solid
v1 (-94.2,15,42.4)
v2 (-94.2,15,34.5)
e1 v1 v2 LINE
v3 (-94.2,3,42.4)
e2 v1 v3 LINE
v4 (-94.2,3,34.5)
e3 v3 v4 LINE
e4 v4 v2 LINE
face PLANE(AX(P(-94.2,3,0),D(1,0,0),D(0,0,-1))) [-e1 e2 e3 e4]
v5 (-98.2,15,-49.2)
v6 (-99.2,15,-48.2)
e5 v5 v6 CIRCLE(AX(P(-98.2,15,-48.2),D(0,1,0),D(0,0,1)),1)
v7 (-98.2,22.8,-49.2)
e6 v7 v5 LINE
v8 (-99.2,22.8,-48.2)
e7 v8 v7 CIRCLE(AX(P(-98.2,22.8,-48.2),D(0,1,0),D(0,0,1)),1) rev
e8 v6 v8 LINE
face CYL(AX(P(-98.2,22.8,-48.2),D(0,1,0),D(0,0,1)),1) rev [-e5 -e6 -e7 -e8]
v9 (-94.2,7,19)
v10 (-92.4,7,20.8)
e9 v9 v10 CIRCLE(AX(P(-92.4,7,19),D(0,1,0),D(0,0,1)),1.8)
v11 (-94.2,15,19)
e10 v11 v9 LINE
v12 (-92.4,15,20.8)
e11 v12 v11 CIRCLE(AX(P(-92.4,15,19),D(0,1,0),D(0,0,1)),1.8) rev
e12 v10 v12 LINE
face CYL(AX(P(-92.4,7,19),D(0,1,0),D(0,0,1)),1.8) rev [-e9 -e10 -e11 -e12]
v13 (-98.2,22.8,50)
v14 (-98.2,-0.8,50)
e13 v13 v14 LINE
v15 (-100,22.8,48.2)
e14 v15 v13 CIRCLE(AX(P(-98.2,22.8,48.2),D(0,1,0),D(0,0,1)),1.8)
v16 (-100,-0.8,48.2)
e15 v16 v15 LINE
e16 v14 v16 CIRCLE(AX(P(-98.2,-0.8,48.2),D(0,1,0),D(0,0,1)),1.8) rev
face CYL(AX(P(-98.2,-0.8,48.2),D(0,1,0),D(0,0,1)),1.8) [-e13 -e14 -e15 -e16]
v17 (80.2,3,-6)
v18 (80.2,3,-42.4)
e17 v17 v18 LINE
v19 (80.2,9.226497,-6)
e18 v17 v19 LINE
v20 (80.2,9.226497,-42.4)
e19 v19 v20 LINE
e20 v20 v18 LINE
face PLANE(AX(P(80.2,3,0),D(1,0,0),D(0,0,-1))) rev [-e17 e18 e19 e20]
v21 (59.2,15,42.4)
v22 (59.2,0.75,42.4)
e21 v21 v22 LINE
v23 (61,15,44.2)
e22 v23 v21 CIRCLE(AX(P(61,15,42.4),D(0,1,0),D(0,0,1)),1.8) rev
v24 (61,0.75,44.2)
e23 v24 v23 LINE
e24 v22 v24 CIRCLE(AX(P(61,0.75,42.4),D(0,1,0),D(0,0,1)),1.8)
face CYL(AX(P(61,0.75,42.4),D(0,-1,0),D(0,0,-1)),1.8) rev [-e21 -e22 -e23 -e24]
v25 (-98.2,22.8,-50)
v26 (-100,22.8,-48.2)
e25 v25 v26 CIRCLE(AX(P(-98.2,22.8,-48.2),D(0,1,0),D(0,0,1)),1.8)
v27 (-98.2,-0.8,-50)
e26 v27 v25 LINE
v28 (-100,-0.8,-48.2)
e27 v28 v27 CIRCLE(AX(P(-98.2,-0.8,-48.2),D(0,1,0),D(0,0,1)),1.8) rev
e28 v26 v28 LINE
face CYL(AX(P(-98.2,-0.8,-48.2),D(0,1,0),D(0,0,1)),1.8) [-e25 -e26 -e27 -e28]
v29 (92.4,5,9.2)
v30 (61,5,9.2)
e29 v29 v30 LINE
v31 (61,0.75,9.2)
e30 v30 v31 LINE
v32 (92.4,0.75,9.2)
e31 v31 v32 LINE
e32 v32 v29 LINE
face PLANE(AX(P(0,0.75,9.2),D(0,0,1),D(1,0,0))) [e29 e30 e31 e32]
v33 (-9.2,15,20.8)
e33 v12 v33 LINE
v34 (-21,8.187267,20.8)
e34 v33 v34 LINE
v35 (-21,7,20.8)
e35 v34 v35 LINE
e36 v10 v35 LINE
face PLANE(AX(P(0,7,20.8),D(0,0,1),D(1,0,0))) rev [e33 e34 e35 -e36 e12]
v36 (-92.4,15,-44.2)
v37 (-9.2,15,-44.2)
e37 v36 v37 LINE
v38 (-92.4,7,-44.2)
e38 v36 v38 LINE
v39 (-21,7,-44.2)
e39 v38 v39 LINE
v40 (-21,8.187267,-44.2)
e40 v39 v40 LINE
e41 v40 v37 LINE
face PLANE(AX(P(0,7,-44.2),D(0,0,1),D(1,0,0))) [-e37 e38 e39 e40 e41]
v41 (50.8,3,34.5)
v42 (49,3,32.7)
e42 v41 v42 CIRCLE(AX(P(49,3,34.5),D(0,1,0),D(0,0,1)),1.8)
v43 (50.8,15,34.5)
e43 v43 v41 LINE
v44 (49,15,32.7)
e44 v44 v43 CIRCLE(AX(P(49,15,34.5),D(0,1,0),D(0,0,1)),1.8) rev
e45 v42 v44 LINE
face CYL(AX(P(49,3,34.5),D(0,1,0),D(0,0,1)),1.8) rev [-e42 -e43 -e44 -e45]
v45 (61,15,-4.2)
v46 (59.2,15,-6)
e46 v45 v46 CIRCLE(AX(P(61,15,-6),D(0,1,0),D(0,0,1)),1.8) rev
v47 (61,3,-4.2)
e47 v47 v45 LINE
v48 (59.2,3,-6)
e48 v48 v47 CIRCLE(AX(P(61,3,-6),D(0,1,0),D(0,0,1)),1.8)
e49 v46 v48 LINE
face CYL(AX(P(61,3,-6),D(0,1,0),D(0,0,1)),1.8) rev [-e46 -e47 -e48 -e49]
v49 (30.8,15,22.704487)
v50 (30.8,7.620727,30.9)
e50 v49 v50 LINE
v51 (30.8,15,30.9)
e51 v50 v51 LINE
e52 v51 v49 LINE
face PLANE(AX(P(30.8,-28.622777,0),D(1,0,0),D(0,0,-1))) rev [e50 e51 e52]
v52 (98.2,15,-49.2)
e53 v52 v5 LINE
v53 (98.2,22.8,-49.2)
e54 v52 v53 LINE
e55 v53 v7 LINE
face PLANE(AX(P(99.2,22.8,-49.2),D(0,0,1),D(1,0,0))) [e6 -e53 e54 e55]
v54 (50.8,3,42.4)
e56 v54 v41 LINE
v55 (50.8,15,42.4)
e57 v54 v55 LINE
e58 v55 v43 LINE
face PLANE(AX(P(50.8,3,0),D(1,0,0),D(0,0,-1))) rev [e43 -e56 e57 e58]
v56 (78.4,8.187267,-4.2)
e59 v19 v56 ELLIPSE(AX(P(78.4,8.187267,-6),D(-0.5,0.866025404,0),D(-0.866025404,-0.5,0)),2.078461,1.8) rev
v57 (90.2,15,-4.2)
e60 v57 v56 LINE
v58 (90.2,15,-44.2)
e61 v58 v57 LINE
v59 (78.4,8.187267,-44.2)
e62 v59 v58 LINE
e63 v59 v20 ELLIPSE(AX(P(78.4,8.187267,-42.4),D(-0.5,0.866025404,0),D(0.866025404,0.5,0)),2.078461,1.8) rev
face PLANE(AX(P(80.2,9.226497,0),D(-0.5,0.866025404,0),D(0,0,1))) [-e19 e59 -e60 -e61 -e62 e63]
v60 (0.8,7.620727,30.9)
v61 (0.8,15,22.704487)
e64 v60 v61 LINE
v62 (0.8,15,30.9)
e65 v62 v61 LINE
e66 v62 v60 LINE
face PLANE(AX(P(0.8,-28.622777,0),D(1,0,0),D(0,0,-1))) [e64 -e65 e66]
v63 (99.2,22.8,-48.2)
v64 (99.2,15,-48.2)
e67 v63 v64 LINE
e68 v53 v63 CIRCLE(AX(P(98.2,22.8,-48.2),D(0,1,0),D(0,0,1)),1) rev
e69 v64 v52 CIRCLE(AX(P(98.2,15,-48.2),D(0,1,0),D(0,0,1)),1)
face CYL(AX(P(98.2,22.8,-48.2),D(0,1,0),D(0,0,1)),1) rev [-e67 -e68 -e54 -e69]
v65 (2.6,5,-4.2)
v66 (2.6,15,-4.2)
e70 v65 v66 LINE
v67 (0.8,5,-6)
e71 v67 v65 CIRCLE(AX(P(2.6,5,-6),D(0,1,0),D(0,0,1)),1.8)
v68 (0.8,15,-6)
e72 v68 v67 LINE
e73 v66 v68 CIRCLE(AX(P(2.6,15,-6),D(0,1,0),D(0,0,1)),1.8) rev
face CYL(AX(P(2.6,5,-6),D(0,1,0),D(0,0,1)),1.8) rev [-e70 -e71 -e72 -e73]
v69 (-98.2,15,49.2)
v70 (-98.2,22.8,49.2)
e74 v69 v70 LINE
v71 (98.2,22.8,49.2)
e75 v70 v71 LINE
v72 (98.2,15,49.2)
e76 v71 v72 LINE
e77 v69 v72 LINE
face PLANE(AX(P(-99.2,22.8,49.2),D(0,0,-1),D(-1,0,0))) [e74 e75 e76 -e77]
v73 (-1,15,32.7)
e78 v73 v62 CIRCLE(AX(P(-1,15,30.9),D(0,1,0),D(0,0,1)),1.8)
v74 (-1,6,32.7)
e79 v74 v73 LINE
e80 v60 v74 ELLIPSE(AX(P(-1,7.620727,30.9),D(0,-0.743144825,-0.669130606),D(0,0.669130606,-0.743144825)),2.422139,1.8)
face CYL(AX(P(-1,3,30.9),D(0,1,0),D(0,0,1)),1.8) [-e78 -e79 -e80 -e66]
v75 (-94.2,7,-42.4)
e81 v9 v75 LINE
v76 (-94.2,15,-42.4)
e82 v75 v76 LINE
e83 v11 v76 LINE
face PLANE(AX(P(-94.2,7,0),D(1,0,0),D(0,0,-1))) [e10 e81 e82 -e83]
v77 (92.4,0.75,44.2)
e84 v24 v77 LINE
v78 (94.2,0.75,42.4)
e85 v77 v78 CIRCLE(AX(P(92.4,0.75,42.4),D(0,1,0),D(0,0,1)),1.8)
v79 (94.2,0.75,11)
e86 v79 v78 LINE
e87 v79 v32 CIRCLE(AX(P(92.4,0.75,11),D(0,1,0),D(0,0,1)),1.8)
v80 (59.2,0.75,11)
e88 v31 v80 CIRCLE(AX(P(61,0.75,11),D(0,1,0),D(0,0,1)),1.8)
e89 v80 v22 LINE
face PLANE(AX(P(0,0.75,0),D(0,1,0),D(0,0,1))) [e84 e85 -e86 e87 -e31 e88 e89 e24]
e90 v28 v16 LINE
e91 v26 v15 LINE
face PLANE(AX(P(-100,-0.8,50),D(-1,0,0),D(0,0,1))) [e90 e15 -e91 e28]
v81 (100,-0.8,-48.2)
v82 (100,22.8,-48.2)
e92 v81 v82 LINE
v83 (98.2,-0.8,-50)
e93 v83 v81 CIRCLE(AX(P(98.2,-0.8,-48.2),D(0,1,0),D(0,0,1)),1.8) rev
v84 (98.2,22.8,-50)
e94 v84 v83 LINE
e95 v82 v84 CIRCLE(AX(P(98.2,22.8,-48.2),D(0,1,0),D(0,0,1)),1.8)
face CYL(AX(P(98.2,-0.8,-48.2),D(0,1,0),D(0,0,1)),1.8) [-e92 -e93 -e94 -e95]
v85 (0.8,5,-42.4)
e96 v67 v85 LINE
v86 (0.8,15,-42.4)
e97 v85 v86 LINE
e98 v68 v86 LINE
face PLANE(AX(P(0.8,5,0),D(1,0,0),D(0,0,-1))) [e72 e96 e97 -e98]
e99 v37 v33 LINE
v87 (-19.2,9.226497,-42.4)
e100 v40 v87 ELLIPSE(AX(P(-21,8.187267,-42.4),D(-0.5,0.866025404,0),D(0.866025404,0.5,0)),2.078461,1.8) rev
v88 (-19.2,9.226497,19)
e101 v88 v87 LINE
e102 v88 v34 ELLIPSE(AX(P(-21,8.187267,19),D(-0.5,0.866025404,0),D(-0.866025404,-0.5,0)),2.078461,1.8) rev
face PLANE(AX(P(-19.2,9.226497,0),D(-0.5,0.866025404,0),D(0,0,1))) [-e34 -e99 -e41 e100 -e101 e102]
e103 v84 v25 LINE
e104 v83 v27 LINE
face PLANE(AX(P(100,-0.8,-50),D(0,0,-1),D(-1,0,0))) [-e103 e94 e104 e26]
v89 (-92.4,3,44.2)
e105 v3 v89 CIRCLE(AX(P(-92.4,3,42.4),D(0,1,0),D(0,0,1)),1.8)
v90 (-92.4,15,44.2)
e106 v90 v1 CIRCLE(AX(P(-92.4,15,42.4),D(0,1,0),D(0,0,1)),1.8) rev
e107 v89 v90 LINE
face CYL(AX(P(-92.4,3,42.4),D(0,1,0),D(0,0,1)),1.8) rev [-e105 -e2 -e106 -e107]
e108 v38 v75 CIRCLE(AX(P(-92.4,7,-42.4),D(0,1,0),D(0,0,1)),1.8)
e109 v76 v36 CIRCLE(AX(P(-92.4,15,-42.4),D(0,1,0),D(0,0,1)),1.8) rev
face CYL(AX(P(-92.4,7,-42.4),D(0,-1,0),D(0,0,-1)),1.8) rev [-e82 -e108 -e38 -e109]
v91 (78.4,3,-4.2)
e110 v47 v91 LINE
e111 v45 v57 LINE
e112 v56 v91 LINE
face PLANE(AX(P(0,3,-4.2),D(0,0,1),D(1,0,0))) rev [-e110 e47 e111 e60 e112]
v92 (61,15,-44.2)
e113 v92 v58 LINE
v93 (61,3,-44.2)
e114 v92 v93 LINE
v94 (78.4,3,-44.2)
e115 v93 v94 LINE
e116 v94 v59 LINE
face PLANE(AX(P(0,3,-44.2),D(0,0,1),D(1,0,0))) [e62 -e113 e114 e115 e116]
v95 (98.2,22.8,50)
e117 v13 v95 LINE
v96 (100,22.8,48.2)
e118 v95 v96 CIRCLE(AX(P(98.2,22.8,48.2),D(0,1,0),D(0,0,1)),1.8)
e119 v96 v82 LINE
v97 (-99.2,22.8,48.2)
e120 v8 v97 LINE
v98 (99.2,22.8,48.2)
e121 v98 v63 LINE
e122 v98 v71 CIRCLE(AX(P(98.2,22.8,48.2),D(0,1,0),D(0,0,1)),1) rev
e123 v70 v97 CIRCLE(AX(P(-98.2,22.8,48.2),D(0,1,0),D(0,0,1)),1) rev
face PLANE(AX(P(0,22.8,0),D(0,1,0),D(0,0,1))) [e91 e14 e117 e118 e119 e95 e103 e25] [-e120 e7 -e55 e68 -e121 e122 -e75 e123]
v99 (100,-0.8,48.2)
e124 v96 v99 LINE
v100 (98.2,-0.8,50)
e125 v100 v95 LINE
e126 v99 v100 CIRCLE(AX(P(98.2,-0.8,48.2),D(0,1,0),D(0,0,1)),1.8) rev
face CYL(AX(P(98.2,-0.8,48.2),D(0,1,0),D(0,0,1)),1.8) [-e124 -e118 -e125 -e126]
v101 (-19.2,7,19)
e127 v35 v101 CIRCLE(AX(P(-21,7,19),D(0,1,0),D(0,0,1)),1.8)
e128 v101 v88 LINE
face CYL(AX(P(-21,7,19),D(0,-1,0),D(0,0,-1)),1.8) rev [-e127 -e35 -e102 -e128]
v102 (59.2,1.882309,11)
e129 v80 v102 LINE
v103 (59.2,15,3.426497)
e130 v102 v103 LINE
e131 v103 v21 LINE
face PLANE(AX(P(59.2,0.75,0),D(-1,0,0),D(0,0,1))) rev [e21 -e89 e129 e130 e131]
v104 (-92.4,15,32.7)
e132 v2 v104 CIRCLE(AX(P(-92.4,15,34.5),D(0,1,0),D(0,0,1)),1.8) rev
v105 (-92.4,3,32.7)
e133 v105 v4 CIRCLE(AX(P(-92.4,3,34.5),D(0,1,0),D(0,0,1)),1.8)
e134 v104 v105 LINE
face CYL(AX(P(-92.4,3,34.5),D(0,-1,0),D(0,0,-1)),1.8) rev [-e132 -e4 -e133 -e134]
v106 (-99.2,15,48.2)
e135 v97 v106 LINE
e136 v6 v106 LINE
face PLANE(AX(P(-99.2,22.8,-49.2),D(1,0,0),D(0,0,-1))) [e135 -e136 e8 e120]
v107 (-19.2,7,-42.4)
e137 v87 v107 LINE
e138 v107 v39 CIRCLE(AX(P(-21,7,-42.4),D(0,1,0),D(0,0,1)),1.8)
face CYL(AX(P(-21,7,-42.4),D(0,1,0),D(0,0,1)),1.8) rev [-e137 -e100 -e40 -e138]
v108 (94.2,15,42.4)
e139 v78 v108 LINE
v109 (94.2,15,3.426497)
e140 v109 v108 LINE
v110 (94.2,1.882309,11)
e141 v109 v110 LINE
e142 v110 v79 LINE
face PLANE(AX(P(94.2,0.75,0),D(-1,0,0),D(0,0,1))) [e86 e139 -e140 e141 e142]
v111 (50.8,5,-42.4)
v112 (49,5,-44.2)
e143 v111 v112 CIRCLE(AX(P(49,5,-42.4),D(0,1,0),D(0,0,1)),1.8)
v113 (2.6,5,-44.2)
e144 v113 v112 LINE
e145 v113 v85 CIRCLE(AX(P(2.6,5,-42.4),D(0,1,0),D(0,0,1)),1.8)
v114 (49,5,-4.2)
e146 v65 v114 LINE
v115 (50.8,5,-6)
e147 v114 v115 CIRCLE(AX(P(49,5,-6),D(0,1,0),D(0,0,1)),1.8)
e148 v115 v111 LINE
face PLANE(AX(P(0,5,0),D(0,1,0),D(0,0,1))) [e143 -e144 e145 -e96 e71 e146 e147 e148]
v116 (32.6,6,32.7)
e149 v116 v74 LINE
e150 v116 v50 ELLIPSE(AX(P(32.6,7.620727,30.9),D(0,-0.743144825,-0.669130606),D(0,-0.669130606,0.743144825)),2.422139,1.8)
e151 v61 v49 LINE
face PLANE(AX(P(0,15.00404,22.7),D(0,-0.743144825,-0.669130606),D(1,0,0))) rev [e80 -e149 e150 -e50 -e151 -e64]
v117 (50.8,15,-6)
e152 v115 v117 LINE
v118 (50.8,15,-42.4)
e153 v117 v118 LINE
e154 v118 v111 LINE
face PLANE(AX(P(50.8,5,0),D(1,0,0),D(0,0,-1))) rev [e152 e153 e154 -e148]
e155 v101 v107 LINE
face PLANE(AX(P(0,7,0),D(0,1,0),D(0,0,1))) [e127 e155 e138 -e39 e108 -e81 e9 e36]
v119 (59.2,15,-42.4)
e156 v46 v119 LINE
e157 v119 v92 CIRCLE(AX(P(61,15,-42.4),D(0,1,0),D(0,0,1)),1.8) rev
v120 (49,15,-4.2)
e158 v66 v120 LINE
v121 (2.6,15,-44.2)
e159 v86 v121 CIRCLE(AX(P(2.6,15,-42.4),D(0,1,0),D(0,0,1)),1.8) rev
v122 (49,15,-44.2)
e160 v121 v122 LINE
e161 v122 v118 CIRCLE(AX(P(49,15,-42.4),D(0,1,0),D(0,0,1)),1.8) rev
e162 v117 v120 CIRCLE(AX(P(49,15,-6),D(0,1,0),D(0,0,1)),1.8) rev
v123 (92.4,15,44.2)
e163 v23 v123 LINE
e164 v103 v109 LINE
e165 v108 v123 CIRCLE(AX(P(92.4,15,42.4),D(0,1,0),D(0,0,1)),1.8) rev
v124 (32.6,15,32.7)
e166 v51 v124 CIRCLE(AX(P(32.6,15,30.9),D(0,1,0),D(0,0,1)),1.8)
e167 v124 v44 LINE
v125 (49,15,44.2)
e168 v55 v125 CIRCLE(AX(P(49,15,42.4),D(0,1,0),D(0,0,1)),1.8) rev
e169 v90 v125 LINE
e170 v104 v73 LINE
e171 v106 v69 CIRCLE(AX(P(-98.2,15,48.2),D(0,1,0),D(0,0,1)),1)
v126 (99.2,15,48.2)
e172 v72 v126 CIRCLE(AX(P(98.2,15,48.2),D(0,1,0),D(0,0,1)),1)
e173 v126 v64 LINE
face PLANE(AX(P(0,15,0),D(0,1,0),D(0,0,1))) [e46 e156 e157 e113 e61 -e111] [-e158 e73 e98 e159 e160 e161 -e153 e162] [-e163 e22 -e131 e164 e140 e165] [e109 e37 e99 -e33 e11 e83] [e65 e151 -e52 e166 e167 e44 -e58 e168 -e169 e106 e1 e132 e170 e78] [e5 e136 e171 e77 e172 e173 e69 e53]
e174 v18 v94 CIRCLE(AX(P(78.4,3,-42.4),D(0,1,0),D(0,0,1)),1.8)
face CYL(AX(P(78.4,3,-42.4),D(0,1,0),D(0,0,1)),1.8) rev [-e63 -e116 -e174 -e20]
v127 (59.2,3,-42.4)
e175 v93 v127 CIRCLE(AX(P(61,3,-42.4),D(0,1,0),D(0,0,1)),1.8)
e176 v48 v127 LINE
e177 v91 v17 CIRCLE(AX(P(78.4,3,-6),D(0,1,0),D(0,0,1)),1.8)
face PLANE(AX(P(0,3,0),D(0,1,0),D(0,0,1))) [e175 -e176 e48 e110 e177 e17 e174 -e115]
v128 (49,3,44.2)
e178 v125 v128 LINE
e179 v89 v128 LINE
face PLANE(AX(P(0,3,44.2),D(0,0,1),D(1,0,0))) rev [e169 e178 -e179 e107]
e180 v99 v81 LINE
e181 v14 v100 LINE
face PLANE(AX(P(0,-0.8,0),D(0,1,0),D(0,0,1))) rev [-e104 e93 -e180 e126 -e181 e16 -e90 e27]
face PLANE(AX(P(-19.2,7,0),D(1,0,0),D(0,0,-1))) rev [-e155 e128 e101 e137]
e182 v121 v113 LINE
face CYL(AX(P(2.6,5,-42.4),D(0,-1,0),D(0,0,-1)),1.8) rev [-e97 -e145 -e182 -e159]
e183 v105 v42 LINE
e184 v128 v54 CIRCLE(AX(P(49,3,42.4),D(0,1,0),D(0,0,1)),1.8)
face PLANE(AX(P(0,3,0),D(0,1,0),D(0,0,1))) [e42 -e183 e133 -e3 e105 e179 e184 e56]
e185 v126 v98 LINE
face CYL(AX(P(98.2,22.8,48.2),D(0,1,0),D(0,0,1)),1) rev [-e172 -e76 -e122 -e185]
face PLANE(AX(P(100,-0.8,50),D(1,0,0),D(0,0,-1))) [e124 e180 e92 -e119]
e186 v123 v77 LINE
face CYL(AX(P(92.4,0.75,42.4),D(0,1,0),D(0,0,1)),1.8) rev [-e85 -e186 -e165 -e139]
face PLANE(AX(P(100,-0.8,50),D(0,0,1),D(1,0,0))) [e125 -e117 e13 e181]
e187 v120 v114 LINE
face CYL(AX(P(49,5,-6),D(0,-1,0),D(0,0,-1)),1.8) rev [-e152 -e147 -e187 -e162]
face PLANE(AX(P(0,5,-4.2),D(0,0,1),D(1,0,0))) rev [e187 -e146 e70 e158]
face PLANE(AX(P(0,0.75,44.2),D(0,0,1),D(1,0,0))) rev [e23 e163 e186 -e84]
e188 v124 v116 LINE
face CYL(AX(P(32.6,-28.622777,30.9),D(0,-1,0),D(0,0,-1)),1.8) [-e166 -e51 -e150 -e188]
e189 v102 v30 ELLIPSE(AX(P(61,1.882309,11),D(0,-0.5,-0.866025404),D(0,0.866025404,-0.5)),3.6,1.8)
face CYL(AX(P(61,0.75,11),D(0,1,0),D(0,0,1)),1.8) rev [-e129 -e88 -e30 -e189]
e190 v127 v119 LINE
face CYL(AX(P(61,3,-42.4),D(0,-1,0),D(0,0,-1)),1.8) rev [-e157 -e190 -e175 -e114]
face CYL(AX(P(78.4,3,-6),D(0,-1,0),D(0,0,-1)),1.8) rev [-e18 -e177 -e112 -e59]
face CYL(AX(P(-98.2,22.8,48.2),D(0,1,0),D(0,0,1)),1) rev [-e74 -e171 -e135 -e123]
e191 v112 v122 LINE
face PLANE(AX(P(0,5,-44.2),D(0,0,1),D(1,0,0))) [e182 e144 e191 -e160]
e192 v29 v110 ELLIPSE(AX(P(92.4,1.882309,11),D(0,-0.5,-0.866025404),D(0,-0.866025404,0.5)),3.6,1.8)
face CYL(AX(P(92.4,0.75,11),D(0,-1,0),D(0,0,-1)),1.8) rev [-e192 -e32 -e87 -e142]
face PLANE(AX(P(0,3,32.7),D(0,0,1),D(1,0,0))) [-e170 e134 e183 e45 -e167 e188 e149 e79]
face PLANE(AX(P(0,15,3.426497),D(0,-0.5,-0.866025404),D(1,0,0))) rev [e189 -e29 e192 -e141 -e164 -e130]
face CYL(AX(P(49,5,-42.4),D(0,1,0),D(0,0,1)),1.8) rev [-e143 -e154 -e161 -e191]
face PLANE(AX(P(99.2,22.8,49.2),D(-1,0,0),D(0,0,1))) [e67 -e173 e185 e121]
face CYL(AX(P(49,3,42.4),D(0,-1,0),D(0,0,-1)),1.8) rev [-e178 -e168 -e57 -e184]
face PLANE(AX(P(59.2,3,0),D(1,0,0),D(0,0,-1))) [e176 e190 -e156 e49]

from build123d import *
from OCP.BRepFilletAPI import BRepFilletAPI_MakeChamfer

# Parameters (mm, degrees)
SKETCH1_W           = 200
SKETCH1_H           = 100
BOSS_EXTRUDE1_DEPTH = 0.8
SKETCH2_W           = 200
SKETCH2_H           = 100
SKETCH2_W_2         = 198.4
SKETCH2_H_2         = 98.4
BOSS_EXTRUDE2_DEPTH = 15
SKETCH3_W           = 145
SKETCH3_H           = 11.5
BLENDER_DEPTH       = 12
SKETCH3_3_W         = 75
SKETCH3_3_H         = 65
CHARCOALS_DEPTH     = 8
SKETCH3_4_W         = 50
SKETCH3_4_H         = 40
RUBBER_DEPTH        = 10
SKETCH3_5_W         = 21
SKETCH3_5_H         = 40
ERASER_DEPTH        = 12
SKETCH3_6_W         = 35
SKETCH3_6_H         = 35
SHARPENER_DEPTH     = 14.25
CHAMFER1_SIZE       = 10
CHAMFER1_SIZE2      = 5.773502692
SKETCH3_7_W         = 30
SKETCH3_7_H         = 10
CUT_EXTRUDE6_DEPTH  = 9
CHAMFER2_SIZE       = 9.004040443
CHAMFER2_SIZE_2     = 10
SKETCH4_W           = 200
SKETCH4_H           = 100
SKETCH4_W_2         = 198.4
SKETCH4_H_2         = 98.4
BOSS_EXTRUDE3_DEPTH = 7.8
FILLET1_R           = 1
FILLET2_R           = 1.8
FILLET3_R           = 1.8


with BuildPart() as part:
    # Sketch1 → Boss-Extrude1 (new body)
    with BuildSketch(Plane(origin=(0, 0, 0), x_dir=(1, 0, 0), z_dir=(0, 1, 0))):
        Rectangle(SKETCH1_W, SKETCH1_H)
    extrude(amount=-BOSS_EXTRUDE1_DEPTH)

    # Sketch2 → Boss-Extrude2 (add)
    # profile 1 of 2: a face of its own
    with BuildSketch(Plane(origin=(0, 0, 0), x_dir=(1, 0, 0), z_dir=(0, 1, 0))):
        Rectangle(SKETCH2_W, SKETCH2_H)
        Rectangle(SKETCH2_W_2, SKETCH2_H_2, mode=Mode.SUBTRACT)
    # profile 2 of 2: a face of its own
    with BuildSketch(Plane(origin=(0, 0, 0), x_dir=(1, 0, 0), z_dir=(0, 1, 0))):
        Rectangle(SKETCH2_W_2, SKETCH2_H_2)
    extrude(amount=BOSS_EXTRUDE2_DEPTH)

    # Sketch3 → Blender (cut)
    with BuildSketch(Plane(origin=(0, 15, 0), x_dir=(1, 0, 0), z_dir=(0, 1, 0))):
        with Locations((-21.7, -38.45)):
            Rectangle(SKETCH3_W, SKETCH3_H)
    extrude(amount=-BLENDER_DEPTH, mode=Mode.SUBTRACT)

    # Sketch3<3> → Charcoals (cut)
    with BuildSketch(Plane(origin=(0, 15, 0), x_dir=(1, 0, 0), z_dir=(0, 1, 0))):
        with Locations((-56.7, 11.7)):
            Rectangle(SKETCH3_3_W, SKETCH3_3_H)
    extrude(amount=-CHARCOALS_DEPTH, mode=Mode.SUBTRACT)

    # Sketch3<4> → Rubber (cut)
    with BuildSketch(Plane(origin=(0, 15, 0), x_dir=(1, 0, 0), z_dir=(0, 1, 0))):
        with Locations((25.8, 24.2)):
            Rectangle(SKETCH3_4_W, SKETCH3_4_H)
    extrude(amount=-RUBBER_DEPTH, mode=Mode.SUBTRACT)

    # Sketch3<5> → Eraser (cut)
    with BuildSketch(Plane(origin=(0, 15, 0), x_dir=(1, 0, 0), z_dir=(0, 1, 0))):
        with Locations((69.7, 24.2)):
            Rectangle(SKETCH3_5_W, SKETCH3_5_H)
    extrude(amount=-ERASER_DEPTH, mode=Mode.SUBTRACT)

    # Sketch3<6> → Sharpener (cut)
    with BuildSketch(Plane(origin=(0, 15, 0), x_dir=(1, 0, 0), z_dir=(0, 1, 0))):
        with Locations((76.7, -26.7)):
            Rectangle(SKETCH3_6_W, SKETCH3_6_H)
    extrude(amount=-SHARPENER_DEPTH, mode=Mode.SUBTRACT)

    # Chamfer1: one chamfer whose edges measure the first distance from different faces: ONE call of the kernel's chamfer builder (chamfer() names one face for all edges)
    chamfer1_edges_1 = [part.edges().sort_by_distance(p)[0] for p in [
        (-19.2, 15, -11.7),
        (80.2, 15, -24.2),
    ]]
    chamfer1_side_1 = [part.faces().sort_by_distance(p)[0] for p in [
        (11.550891669, 15, 3.081461272),
    ]]
    chamfer1_edges_2 = [part.edges().sort_by_distance(p)[0] for p in [
        (76.7, 15, 9.2),
    ]]
    chamfer1_side_2 = [part.faces().sort_by_distance(p)[0] for p in [
        (76.7, 7.875, 9.2),
    ]]
    chamfer1 = BRepFilletAPI_MakeChamfer(part.part.solid().wrapped)
    for e in chamfer1_edges_1:
        chamfer1.Add(CHAMFER1_SIZE, CHAMFER1_SIZE2, e.wrapped, chamfer1_side_1[0].wrapped)  # the first distance lies on this face
    for e in chamfer1_edges_2:
        chamfer1.Add(CHAMFER1_SIZE, CHAMFER1_SIZE2, e.wrapped, chamfer1_side_2[0].wrapped)  # the first distance lies on this face
    add(Compound.cast(chamfer1.Shape()), mode=Mode.REPLACE)

    # Sketch3<7> → Cut-Extrude6 (cut)
    with BuildSketch(Plane(origin=(0, 15, 0), x_dir=(1, 0, 0), z_dir=(0, 1, 0))):
        with Locations((15.8, -27.7)):
            Rectangle(SKETCH3_7_W, SKETCH3_7_H)
    extrude(amount=-CUT_EXTRUDE6_DEPTH, mode=Mode.SUBTRACT)

    # Chamfer2
    # the kernel refuses this chamfer: 10, 9.004040443 mm, written as the material it adds along each edge
    with BuildSketch(Plane(origin=(56.551839571, 6, 22.7), x_dir=(0, 0.9994864482690294, -0.032044340008195435), z_dir=(-1, 0, 0))) as chamfer2_piece_1_section:
        Polygon((CHAMFER2_SIZE * 0.999486448267, -CHAMFER2_SIZE * 0.0320443400081), (-CHAMFER2_SIZE_2 * 0.0320443400082, -CHAMFER2_SIZE_2 * 0.999486448269), (0, 0), align=None)
    chamfer2_piece_1 = extrude(amount=81.503679141, mode=Mode.PRIVATE)
    chamfer2_piece_1 = split(chamfer2_piece_1, bisect_by=Plane(origin=(15.8, 15, 26.033334004), z_dir=(0, -1, 0)), keep=Keep.TOP, mode=Mode.PRIVATE)
    add(chamfer2_piece_1)

    # Sketch4 → Boss-Extrude3 (add)
    with BuildSketch(Plane(origin=(0, 15, 0), x_dir=(1, 0, 0), z_dir=(0, 1, 0))):
        Rectangle(SKETCH4_W, SKETCH4_H)
        Rectangle(SKETCH4_W_2, SKETCH4_H_2, mode=Mode.SUBTRACT)
    extrude(amount=BOSS_EXTRUDE3_DEPTH)

    # Fillet1
    fillet1_edges = [part.edges().sort_by_distance(p)[0] for p in [
        (-99.2, 18.9, -49.2),
        (-99.2, 18.9, 49.2),
        (99.2, 18.9, 49.2),
        (99.2, 18.9, -49.2),
    ]]
    fillet(fillet1_edges, radius=FILLET1_R)

    # Fillet2
    fillet2_edges = [part.edges().sort_by_distance(p)[0] for p in [
        (-100, 11, -50),
        (100, 11, -50),
        (100, 11, 50),
        (-100, 11, 50),
    ]]
    fillet(fillet2_edges, radius=FILLET2_R)

    # Fillet3
    # the kernel refuses this fillet: 1.8 mm, written as the material it adds along each edge
    with BuildSketch(Plane(origin=(50.8, 15, 44.2), x_dir=(0, 0, -1), z_dir=(0, -1, 0)), Plane(origin=(50.8, 15, 32.7), x_dir=(-1, 0, 0), z_dir=(0, -1, 0)), Plane(origin=(59.2, 15, -4.2), x_dir=(1, 0, 0), z_dir=(0, -1, 0))) as fillet3_piece_1:
        with BuildLine():
            CenterArc((FILLET3_R, -FILLET3_R), FILLET3_R, 90, 90)
            Line((0, -FILLET3_R), (0, 0))
            Line((0, 0), (FILLET3_R, 0))
        make_face()
    extrude(amount=12)
    with BuildSketch(Plane(origin=(-94.2, 15, 44.2), x_dir=(0, 0, -1), z_dir=(0, -1, 0)), Plane(origin=(-94.2, 15, 32.7), x_dir=(1, 0, 0), z_dir=(0, -1, 0)), Plane(origin=(59.2, 15, -44.2), x_dir=(1, 0, 0), z_dir=(0, -1, 0))) as fillet3_piece_2:
        with BuildLine():
            CenterArc((FILLET3_R, FILLET3_R), FILLET3_R, 180, 90)
            Line((0, FILLET3_R), (0, 0))
            Line((0, 0), (FILLET3_R, 0))
        make_face()
    extrude(amount=12)
    with BuildSketch(Plane(origin=(-19.2, 13.726497308, 20.8), x_dir=(-1, 0, 0), z_dir=(0, -1, 0))) as fillet3_piece_3_section:
        with BuildLine():
            CenterArc((FILLET3_R, FILLET3_R), FILLET3_R, 180, 90)
            Line((0, FILLET3_R), (0, 0))
            Line((0, 0), (FILLET3_R, 0))
        make_face()
    fillet3_piece_3 = extrude(amount=11.226497308, mode=Mode.PRIVATE)
    fillet3_piece_3 = split(fillet3_piece_3, bisect_by=Plane(origin=(-20.005000388, 8.761730117, 20.378537809), z_dir=(0.5000000000000009, -0.8660254037844382, 0)), keep=Keep.TOP, mode=Mode.PRIVATE)
    add(fillet3_piece_3)
    with BuildSketch(Plane(origin=(-94.2, 15, 20.8), x_dir=(1, 0, 0), z_dir=(0, -1, 0)), Plane(origin=(-94.2, 15, -44.2), x_dir=(0, 0, 1), z_dir=(0, -1, 0))) as fillet3_piece_4:
        with BuildLine():
            CenterArc((FILLET3_R, -FILLET3_R), FILLET3_R, 90, 90)
            Line((0, -FILLET3_R), (0, 0))
            Line((0, 0), (FILLET3_R, 0))
        make_face()
    extrude(amount=12.5)
    with BuildSketch(Plane(origin=(-19.2, 13.726497308, -44.2), x_dir=(-1, 0, 0), z_dir=(0, -1, 0))) as fillet3_piece_5_section:
        with BuildLine():
            CenterArc((FILLET3_R, -FILLET3_R), FILLET3_R, 90, 90)
            Line((0, -FILLET3_R), (0, 0))
            Line((0, 0), (FILLET3_R, 0))
        make_face()
    fillet3_piece_5 = extrude(amount=11.226497308, mode=Mode.PRIVATE)
    fillet3_piece_5 = split(fillet3_piece_5, bisect_by=Plane(origin=(-20.005000388, 8.761730117, -43.778537809), z_dir=(0.5000000000000009, -0.8660254037844382, 0)), keep=Keep.TOP, mode=Mode.PRIVATE)
    add(fillet3_piece_5)
    with BuildSketch(Plane(origin=(50.8, 15, -4.2), x_dir=(-1, 0, 0), z_dir=(0, -1, 0)), Plane(origin=(50.8, 15, -44.2), x_dir=(0, 0, 1), z_dir=(0, -1, 0))) as fillet3_piece_6:
        with BuildLine():
            CenterArc((FILLET3_R, FILLET3_R), FILLET3_R, 180, 90)
            Line((0, FILLET3_R), (0, 0))
            Line((0, 0), (FILLET3_R, 0))
        make_face()
    extrude(amount=14.5)
    with BuildSketch(Plane(origin=(0.8, 15, -4.2), x_dir=(1, 0, 0), z_dir=(0, -1, 0)), Plane(origin=(0.8, 15, -44.2), x_dir=(0, 0, 1), z_dir=(0, -1, 0))) as fillet3_piece_7:
        with BuildLine():
            CenterArc((FILLET3_R, -FILLET3_R), FILLET3_R, 90, 90)
            Line((0, -FILLET3_R), (0, 0))
            Line((0, 0), (FILLET3_R, 0))
        make_face()
    extrude(amount=14.5)
    with BuildSketch(Plane(origin=(80.2, 13.726497308, -4.2), x_dir=(-1, 0, 0), z_dir=(0, -1, 0))) as fillet3_piece_8_section:
        with BuildLine():
            CenterArc((FILLET3_R, FILLET3_R), FILLET3_R, 180, 90)
            Line((0, FILLET3_R), (0, 0))
            Line((0, 0), (FILLET3_R, 0))
        make_face()
    fillet3_piece_8 = extrude(amount=10.726497308, mode=Mode.PRIVATE)
    fillet3_piece_8 = split(fillet3_piece_8, bisect_by=Plane(origin=(78.509719514, 8.250613415, -4.608516769), z_dir=(0.5000000000000009, -0.8660254037844382, 0)), keep=Keep.TOP, mode=Mode.PRIVATE)
    add(fillet3_piece_8)
    with BuildSketch(Plane(origin=(80.2, 13.726497308, -44.2), x_dir=(-1, 0, 0), z_dir=(0, -1, 0))) as fillet3_piece_9_section:
        with BuildLine():
            CenterArc((FILLET3_R, -FILLET3_R), FILLET3_R, 90, 90)
            Line((0, -FILLET3_R), (0, 0))
            Line((0, 0), (FILLET3_R, 0))
        make_face()
    fillet3_piece_9 = extrude(amount=10.726497308, mode=Mode.PRIVATE)
    fillet3_piece_9 = split(fillet3_piece_9, bisect_by=Plane(origin=(78.509719514, 8.250613415, -43.791483231), z_dir=(0.5000000000000009, -0.8660254037844382, 0)), keep=Keep.TOP, mode=Mode.PRIVATE)
    add(fillet3_piece_9)
    with BuildSketch(Plane(origin=(94.2, 9.5, 9.2), x_dir=(0, 0, 1), z_dir=(0, -1, 0))) as fillet3_piece_10_section:
        with BuildLine():
            CenterArc((FILLET3_R, FILLET3_R), FILLET3_R, 180, 90)
            Line((0, FILLET3_R), (0, 0))
            Line((0, 0), (FILLET3_R, 0))
        make_face()
    fillet3_piece_10 = extrude(amount=8.75, mode=Mode.PRIVATE)
    fillet3_piece_10 = split(fillet3_piece_10, bisect_by=Plane(origin=(93.765274696, 3.031109619, 10.336739391), z_dir=(0, -0.500000000000001, -0.866025403784438)), keep=Keep.TOP, mode=Mode.PRIVATE)
    add(fillet3_piece_10)
    with BuildSketch(Plane(origin=(94.2, 15, 44.2), x_dir=(-1, 0, 0), z_dir=(0, -1, 0)), Plane(origin=(59.2, 15, 44.2), x_dir=(0, 0, -1), z_dir=(0, -1, 0))) as fillet3_piece_11:
        with BuildLine():
            CenterArc((FILLET3_R, FILLET3_R), FILLET3_R, 180, 90)
            Line((0, FILLET3_R), (0, 0))
            Line((0, 0), (FILLET3_R, 0))
        make_face()
    extrude(amount=14.25)
    with BuildSketch(Plane(origin=(59.2, 9.5, 9.2), x_dir=(0, 0, 1), z_dir=(0, -1, 0))) as fillet3_piece_12_section:
        with BuildLine():
            CenterArc((FILLET3_R, -FILLET3_R), FILLET3_R, 90, 90)
            Line((0, -FILLET3_R), (0, 0))
            Line((0, 0), (FILLET3_R, 0))
        make_face()
    fillet3_piece_12 = extrude(amount=8.75, mode=Mode.PRIVATE)
    fillet3_piece_12 = split(fillet3_piece_12, bisect_by=Plane(origin=(59.634725304, 3.031109619, 10.336739391), z_dir=(0, -0.500000000000001, -0.866025403784438)), keep=Keep.TOP, mode=Mode.PRIVATE)
    add(fillet3_piece_12)
    # the kernel refuses this fillet: 1.8 mm, written as the material it takes off along each edge
    with BuildSketch(Plane(origin=(0.8, 19.5, 32.7), x_dir=(0, 0, -1), z_dir=(0, -1, 0))) as fillet3_2_piece_1_section:
        with BuildLine():
            CenterArc((FILLET3_R, -FILLET3_R), FILLET3_R, 90, 90)
            Line((0, -FILLET3_R), (0, 0))
            Line((0, 0), (FILLET3_R, 0))
        make_face()
    fillet3_2_piece_1 = extrude(amount=18, mode=Mode.PRIVATE)
    fillet3_2_piece_1 = split(fillet3_2_piece_1, bisect_by=Plane(origin=(0.390952326, 8.287487107, 30.159488191), z_dir=(0, 0.7431448254771393, 0.6691306063591413)), keep=Keep.TOP, mode=Mode.PRIVATE)
    add(fillet3_2_piece_1, mode=Mode.SUBTRACT)
    with BuildSketch(Plane(origin=(30.8, 19.5, 32.7), x_dir=(1, 0, 0), z_dir=(0, -1, 0))) as fillet3_2_piece_2_section:
        with BuildLine():
            CenterArc((FILLET3_R, -FILLET3_R), FILLET3_R, 90, 90)
            Line((0, -FILLET3_R), (0, 0))
            Line((0, 0), (FILLET3_R, 0))
        make_face()
    fillet3_2_piece_2 = extrude(amount=18, mode=Mode.PRIVATE)
    fillet3_2_piece_2 = split(fillet3_2_piece_2, bisect_by=Plane(origin=(31.209047674, 8.287487107, 30.159488191), z_dir=(0, 0.7431448254771393, 0.6691306063591413)), keep=Keep.TOP, mode=Mode.PRIVATE)
    add(fillet3_2_piece_2, mode=Mode.SUBTRACT)


solid = part.part
